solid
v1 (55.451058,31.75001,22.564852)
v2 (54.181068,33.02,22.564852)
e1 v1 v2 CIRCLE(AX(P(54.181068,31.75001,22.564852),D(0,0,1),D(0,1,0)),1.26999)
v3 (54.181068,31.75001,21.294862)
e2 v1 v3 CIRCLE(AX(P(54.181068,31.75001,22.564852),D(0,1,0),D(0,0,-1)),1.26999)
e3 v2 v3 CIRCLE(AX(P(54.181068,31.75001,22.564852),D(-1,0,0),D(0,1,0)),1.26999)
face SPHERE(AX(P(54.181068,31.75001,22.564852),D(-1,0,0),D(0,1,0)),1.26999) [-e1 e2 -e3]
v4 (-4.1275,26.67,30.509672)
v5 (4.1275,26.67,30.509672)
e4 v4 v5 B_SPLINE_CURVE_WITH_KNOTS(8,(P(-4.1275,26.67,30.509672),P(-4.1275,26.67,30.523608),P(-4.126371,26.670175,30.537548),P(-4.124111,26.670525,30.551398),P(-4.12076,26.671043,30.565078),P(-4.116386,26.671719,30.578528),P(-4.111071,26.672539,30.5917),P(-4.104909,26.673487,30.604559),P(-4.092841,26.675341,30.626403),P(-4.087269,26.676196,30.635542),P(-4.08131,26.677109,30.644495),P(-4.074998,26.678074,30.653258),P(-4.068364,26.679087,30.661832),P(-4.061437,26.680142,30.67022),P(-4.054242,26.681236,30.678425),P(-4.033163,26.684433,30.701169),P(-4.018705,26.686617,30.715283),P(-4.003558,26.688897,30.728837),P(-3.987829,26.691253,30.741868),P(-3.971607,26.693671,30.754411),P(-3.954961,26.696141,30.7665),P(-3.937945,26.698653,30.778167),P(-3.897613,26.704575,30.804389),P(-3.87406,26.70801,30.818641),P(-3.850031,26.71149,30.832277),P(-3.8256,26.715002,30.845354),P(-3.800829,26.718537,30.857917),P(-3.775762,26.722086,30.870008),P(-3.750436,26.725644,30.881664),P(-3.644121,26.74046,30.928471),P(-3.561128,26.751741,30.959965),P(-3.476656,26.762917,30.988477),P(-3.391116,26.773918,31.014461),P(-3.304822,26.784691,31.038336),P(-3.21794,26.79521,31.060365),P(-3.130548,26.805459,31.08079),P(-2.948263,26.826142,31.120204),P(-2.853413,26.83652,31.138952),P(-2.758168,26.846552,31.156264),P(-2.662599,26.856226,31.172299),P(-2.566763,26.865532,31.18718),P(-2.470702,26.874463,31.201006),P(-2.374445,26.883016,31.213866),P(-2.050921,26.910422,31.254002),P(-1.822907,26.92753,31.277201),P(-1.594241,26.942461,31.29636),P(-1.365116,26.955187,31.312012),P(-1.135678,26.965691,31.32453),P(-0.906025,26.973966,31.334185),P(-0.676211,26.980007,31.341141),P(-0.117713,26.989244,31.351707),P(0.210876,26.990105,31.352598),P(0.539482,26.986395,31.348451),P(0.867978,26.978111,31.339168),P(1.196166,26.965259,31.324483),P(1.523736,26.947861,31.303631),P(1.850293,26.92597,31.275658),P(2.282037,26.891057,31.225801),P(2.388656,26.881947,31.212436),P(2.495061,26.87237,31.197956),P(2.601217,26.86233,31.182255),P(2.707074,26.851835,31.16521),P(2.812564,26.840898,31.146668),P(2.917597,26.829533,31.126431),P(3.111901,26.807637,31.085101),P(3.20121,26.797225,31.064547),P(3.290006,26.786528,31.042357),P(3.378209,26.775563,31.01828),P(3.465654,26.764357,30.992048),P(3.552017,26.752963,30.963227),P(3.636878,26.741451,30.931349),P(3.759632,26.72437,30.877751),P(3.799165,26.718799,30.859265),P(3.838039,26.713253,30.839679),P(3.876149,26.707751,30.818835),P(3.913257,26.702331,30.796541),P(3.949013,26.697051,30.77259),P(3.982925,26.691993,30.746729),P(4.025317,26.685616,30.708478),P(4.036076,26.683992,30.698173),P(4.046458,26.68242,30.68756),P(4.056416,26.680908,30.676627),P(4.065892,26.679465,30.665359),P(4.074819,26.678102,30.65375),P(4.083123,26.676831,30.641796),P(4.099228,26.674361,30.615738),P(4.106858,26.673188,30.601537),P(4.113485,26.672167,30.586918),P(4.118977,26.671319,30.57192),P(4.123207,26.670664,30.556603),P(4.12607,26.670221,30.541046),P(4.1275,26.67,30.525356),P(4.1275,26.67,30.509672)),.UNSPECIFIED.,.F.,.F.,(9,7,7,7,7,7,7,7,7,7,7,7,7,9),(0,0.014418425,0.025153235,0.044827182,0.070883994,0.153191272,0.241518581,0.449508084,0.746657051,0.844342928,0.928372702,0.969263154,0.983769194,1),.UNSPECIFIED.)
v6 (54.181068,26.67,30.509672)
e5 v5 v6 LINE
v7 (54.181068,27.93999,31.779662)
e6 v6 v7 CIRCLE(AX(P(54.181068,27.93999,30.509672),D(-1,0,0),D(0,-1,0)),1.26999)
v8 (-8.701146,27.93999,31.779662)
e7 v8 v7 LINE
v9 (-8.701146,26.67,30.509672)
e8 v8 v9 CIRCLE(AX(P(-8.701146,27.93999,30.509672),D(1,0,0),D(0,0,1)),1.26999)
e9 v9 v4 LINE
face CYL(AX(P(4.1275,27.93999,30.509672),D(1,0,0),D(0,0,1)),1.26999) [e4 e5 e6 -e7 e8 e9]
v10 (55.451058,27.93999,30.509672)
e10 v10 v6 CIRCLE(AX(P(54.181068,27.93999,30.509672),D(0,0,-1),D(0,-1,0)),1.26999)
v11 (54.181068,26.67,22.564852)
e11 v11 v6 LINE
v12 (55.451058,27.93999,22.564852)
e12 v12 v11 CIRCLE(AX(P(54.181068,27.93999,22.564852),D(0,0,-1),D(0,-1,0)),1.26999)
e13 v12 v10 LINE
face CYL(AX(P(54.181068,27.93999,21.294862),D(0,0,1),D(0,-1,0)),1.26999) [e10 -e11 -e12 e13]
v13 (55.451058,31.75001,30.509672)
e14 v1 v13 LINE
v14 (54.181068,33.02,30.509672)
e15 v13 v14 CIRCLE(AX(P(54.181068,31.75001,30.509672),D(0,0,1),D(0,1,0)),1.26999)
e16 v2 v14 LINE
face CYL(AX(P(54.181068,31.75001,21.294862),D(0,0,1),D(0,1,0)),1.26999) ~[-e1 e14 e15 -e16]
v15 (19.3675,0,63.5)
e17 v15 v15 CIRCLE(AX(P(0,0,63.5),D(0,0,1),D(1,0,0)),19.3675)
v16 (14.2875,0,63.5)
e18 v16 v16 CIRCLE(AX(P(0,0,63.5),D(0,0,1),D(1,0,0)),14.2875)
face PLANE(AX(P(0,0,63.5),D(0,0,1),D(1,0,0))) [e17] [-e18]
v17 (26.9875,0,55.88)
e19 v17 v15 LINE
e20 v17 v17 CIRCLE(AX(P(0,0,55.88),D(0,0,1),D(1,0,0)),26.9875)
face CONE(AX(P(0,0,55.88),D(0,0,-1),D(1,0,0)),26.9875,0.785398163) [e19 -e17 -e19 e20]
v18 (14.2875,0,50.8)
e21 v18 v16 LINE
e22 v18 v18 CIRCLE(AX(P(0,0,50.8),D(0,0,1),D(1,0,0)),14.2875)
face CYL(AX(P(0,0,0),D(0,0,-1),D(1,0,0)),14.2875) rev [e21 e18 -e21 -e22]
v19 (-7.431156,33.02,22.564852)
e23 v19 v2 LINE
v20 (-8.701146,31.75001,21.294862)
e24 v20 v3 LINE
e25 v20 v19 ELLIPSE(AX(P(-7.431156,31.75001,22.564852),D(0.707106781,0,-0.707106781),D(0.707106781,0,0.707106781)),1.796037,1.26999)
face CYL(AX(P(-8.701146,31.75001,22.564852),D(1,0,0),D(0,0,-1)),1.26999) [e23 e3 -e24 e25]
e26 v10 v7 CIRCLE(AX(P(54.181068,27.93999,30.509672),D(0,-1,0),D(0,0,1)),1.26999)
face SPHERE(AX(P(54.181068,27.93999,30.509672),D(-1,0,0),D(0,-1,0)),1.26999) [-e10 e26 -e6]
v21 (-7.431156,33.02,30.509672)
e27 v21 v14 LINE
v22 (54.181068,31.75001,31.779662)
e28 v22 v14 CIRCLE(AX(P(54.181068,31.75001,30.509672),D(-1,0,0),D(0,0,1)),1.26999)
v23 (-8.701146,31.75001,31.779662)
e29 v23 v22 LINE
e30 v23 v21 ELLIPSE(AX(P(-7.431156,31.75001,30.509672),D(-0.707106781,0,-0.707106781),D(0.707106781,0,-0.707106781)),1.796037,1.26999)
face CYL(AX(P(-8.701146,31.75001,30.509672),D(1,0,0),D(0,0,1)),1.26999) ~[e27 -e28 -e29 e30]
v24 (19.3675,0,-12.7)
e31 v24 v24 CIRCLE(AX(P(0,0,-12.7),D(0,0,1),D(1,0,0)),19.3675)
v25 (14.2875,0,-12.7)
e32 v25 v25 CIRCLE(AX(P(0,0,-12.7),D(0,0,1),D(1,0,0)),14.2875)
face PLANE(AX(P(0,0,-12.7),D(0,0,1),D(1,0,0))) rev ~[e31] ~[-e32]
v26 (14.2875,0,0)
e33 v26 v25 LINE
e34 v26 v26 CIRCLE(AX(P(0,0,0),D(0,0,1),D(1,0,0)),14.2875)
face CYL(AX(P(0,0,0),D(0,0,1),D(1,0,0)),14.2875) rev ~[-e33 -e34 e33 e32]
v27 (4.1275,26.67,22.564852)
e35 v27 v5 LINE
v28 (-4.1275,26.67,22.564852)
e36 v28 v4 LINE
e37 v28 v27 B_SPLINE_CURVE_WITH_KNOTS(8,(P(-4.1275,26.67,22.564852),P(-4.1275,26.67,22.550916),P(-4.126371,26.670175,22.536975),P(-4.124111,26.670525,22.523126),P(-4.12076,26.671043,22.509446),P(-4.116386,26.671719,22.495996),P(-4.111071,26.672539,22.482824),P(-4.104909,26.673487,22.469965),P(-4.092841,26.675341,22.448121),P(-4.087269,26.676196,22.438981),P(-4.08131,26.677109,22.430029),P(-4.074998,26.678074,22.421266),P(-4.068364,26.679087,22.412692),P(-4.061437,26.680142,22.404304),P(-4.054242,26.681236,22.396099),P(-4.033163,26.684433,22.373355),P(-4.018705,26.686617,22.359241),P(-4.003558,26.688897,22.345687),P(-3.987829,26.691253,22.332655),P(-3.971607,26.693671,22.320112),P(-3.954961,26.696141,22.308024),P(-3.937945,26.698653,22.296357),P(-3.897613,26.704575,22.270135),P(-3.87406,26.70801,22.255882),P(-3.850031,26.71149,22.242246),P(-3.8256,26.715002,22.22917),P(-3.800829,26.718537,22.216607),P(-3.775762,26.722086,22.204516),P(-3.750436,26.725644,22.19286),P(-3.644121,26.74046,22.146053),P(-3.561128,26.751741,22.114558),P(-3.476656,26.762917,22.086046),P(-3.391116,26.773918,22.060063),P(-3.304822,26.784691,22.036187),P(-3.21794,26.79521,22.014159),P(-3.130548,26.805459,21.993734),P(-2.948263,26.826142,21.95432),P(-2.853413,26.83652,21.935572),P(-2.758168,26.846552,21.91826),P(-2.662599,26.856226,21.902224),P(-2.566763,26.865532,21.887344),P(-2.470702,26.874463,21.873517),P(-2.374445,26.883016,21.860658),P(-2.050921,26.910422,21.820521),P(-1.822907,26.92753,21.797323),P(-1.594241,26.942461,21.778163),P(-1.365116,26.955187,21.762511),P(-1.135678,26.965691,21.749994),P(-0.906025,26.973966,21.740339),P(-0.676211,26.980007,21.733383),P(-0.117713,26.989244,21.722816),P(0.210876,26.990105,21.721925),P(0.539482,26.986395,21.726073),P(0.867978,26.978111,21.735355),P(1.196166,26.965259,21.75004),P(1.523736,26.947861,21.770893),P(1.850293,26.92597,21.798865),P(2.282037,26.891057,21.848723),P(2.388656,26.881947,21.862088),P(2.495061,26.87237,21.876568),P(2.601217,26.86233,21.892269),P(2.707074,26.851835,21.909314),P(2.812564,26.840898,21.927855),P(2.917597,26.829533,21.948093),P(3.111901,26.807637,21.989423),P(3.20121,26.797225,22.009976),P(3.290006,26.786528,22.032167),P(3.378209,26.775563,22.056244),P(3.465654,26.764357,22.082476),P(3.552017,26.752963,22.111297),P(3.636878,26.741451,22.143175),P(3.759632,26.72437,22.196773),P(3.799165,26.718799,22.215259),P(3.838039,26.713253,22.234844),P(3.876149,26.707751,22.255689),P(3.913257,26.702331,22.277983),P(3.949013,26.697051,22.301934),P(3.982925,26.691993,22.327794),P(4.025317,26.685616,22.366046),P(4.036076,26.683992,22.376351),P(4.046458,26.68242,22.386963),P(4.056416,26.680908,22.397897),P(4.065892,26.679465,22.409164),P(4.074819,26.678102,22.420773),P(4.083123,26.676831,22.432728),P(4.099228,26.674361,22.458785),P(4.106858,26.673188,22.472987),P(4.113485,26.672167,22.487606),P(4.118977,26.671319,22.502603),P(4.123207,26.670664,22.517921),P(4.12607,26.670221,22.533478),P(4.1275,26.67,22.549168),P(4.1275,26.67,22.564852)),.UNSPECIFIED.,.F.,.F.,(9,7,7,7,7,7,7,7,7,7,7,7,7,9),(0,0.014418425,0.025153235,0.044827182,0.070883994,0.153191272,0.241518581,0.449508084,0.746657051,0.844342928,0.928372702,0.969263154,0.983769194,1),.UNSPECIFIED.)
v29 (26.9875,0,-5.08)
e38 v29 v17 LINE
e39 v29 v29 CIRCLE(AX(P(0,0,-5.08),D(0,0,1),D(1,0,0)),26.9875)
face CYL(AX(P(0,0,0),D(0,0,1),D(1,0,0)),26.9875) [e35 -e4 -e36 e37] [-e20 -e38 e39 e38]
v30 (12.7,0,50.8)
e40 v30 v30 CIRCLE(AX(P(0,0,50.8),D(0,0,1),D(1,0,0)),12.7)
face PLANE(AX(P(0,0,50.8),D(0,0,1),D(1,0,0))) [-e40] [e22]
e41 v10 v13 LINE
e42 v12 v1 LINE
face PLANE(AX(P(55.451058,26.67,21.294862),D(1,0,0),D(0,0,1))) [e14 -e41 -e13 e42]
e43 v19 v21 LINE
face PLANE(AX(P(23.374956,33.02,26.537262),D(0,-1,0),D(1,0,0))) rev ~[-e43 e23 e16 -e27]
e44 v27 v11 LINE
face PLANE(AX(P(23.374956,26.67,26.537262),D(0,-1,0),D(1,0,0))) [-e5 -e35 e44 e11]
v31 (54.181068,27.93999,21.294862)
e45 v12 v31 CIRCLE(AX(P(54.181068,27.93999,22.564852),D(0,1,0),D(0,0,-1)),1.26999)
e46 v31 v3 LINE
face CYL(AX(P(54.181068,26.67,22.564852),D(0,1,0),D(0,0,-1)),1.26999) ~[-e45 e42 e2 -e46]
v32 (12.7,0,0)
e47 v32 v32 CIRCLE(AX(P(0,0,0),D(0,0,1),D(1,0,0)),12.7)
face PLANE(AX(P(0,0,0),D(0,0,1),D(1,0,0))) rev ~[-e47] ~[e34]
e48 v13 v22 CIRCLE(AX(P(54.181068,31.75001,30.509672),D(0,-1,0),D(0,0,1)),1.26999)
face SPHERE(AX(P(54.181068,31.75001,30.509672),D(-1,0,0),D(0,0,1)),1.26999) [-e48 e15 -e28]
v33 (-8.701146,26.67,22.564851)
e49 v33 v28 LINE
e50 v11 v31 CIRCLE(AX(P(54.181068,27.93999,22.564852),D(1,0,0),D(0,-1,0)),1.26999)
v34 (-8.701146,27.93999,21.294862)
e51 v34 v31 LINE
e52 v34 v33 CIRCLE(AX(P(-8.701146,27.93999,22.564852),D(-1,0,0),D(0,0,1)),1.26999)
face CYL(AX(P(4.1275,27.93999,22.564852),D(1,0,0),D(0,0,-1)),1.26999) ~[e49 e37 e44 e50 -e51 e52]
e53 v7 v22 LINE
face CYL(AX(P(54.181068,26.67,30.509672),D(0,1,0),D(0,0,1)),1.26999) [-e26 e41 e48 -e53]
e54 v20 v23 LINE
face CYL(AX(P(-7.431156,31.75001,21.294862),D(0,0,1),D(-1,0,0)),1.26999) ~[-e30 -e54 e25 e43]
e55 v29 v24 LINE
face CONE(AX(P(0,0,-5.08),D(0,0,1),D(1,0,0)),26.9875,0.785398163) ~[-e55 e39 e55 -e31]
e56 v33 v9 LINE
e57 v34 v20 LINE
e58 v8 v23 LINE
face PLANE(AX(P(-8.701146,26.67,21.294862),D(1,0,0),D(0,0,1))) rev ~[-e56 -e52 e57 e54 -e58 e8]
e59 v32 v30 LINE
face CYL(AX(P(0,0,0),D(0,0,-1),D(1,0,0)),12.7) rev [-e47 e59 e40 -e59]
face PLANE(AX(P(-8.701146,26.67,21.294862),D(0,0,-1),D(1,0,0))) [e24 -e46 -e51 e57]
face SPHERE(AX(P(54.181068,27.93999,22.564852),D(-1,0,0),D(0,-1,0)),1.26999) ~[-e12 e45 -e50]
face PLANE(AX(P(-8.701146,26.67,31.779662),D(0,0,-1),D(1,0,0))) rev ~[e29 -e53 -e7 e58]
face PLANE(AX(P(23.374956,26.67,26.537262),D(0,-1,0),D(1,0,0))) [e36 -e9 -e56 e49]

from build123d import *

# Parameters (mm, degrees)
F0_R          = 14.2875
F0_R_2        = 12.7
F2_DEPTH      = 50.8
F3_R          = 26.9875
F3_R_2        = 14.2875
F4_DEPTH      = 63.5
F4_DEPTH_BACK = 12.7
F5_SIZE       = 7.62
F7_START      = -26.67
F6_W          = 64.1522035003
F6_H          = 10.4847997427
F7_DEPTH      = 6.35
F8_R          = 1.26999


# Not quite as in the source:
# - a fillet or chamfer is up to 0.001 mm smaller than in the source, because OpenCascade refuses the exact size
# - a feature names something its author has since deleted; it is built from what else it names


with BuildPart() as f2:
    # F0 (on Top) → F2 (new body)
    with BuildSketch(Plane.XY):
        Circle(F0_R)
        Circle(F0_R_2, mode=Mode.SUBTRACT)
    extrude(amount=F2_DEPTH)

    # F3 (on face) → F4 (join, two sides)
    with BuildSketch(Plane.XY) as f4_sk:
        Circle(F3_R)
        Circle(F3_R_2, mode=Mode.SUBTRACT)
    extrude(amount=F4_DEPTH)
    extrude(f4_sk.sketch, amount=-F4_DEPTH_BACK)

    # F5
    f5_edges = [f2.edges().sort_by_distance(p)[0] for p in [
        (-26.9875, 0, 63.5),
        (-26.9875, 0, -12.7),
    ]]
    chamfer(f5_edges, length=F5_SIZE)

    # F6 (on Front) → F7 (join)
    with BuildSketch(Plane.XZ.offset(F7_START)):
        with Locations((23.3749561012, 26.5372619033)):
            Rectangle(F6_W, F6_H)
    extrude(amount=-F7_DEPTH)

    # F8 (radius 1.27 in the source; OpenCascade refuses exactly that, so slightly less here)
    f8_edges = [f2.edges().sort_by_distance(p)[0] for p in [
        (23.374956, 33.02, 31.779662),
        (23.374956, 33.02, 21.294862),
        (-8.701146, 33.02, 26.537262),
        (29.789279, 26.67, 21.294862),
        (29.789279, 26.67, 31.779662),
        (55.451058, 26.67, 26.537262),
        (55.451058, 29.845, 31.779662),
        (55.451058, 33.02, 26.537262),
        (55.451058, 29.845, 21.294862),
    ]]
    fillet(f8_edges, radius=F8_R)


solid = f2.part
